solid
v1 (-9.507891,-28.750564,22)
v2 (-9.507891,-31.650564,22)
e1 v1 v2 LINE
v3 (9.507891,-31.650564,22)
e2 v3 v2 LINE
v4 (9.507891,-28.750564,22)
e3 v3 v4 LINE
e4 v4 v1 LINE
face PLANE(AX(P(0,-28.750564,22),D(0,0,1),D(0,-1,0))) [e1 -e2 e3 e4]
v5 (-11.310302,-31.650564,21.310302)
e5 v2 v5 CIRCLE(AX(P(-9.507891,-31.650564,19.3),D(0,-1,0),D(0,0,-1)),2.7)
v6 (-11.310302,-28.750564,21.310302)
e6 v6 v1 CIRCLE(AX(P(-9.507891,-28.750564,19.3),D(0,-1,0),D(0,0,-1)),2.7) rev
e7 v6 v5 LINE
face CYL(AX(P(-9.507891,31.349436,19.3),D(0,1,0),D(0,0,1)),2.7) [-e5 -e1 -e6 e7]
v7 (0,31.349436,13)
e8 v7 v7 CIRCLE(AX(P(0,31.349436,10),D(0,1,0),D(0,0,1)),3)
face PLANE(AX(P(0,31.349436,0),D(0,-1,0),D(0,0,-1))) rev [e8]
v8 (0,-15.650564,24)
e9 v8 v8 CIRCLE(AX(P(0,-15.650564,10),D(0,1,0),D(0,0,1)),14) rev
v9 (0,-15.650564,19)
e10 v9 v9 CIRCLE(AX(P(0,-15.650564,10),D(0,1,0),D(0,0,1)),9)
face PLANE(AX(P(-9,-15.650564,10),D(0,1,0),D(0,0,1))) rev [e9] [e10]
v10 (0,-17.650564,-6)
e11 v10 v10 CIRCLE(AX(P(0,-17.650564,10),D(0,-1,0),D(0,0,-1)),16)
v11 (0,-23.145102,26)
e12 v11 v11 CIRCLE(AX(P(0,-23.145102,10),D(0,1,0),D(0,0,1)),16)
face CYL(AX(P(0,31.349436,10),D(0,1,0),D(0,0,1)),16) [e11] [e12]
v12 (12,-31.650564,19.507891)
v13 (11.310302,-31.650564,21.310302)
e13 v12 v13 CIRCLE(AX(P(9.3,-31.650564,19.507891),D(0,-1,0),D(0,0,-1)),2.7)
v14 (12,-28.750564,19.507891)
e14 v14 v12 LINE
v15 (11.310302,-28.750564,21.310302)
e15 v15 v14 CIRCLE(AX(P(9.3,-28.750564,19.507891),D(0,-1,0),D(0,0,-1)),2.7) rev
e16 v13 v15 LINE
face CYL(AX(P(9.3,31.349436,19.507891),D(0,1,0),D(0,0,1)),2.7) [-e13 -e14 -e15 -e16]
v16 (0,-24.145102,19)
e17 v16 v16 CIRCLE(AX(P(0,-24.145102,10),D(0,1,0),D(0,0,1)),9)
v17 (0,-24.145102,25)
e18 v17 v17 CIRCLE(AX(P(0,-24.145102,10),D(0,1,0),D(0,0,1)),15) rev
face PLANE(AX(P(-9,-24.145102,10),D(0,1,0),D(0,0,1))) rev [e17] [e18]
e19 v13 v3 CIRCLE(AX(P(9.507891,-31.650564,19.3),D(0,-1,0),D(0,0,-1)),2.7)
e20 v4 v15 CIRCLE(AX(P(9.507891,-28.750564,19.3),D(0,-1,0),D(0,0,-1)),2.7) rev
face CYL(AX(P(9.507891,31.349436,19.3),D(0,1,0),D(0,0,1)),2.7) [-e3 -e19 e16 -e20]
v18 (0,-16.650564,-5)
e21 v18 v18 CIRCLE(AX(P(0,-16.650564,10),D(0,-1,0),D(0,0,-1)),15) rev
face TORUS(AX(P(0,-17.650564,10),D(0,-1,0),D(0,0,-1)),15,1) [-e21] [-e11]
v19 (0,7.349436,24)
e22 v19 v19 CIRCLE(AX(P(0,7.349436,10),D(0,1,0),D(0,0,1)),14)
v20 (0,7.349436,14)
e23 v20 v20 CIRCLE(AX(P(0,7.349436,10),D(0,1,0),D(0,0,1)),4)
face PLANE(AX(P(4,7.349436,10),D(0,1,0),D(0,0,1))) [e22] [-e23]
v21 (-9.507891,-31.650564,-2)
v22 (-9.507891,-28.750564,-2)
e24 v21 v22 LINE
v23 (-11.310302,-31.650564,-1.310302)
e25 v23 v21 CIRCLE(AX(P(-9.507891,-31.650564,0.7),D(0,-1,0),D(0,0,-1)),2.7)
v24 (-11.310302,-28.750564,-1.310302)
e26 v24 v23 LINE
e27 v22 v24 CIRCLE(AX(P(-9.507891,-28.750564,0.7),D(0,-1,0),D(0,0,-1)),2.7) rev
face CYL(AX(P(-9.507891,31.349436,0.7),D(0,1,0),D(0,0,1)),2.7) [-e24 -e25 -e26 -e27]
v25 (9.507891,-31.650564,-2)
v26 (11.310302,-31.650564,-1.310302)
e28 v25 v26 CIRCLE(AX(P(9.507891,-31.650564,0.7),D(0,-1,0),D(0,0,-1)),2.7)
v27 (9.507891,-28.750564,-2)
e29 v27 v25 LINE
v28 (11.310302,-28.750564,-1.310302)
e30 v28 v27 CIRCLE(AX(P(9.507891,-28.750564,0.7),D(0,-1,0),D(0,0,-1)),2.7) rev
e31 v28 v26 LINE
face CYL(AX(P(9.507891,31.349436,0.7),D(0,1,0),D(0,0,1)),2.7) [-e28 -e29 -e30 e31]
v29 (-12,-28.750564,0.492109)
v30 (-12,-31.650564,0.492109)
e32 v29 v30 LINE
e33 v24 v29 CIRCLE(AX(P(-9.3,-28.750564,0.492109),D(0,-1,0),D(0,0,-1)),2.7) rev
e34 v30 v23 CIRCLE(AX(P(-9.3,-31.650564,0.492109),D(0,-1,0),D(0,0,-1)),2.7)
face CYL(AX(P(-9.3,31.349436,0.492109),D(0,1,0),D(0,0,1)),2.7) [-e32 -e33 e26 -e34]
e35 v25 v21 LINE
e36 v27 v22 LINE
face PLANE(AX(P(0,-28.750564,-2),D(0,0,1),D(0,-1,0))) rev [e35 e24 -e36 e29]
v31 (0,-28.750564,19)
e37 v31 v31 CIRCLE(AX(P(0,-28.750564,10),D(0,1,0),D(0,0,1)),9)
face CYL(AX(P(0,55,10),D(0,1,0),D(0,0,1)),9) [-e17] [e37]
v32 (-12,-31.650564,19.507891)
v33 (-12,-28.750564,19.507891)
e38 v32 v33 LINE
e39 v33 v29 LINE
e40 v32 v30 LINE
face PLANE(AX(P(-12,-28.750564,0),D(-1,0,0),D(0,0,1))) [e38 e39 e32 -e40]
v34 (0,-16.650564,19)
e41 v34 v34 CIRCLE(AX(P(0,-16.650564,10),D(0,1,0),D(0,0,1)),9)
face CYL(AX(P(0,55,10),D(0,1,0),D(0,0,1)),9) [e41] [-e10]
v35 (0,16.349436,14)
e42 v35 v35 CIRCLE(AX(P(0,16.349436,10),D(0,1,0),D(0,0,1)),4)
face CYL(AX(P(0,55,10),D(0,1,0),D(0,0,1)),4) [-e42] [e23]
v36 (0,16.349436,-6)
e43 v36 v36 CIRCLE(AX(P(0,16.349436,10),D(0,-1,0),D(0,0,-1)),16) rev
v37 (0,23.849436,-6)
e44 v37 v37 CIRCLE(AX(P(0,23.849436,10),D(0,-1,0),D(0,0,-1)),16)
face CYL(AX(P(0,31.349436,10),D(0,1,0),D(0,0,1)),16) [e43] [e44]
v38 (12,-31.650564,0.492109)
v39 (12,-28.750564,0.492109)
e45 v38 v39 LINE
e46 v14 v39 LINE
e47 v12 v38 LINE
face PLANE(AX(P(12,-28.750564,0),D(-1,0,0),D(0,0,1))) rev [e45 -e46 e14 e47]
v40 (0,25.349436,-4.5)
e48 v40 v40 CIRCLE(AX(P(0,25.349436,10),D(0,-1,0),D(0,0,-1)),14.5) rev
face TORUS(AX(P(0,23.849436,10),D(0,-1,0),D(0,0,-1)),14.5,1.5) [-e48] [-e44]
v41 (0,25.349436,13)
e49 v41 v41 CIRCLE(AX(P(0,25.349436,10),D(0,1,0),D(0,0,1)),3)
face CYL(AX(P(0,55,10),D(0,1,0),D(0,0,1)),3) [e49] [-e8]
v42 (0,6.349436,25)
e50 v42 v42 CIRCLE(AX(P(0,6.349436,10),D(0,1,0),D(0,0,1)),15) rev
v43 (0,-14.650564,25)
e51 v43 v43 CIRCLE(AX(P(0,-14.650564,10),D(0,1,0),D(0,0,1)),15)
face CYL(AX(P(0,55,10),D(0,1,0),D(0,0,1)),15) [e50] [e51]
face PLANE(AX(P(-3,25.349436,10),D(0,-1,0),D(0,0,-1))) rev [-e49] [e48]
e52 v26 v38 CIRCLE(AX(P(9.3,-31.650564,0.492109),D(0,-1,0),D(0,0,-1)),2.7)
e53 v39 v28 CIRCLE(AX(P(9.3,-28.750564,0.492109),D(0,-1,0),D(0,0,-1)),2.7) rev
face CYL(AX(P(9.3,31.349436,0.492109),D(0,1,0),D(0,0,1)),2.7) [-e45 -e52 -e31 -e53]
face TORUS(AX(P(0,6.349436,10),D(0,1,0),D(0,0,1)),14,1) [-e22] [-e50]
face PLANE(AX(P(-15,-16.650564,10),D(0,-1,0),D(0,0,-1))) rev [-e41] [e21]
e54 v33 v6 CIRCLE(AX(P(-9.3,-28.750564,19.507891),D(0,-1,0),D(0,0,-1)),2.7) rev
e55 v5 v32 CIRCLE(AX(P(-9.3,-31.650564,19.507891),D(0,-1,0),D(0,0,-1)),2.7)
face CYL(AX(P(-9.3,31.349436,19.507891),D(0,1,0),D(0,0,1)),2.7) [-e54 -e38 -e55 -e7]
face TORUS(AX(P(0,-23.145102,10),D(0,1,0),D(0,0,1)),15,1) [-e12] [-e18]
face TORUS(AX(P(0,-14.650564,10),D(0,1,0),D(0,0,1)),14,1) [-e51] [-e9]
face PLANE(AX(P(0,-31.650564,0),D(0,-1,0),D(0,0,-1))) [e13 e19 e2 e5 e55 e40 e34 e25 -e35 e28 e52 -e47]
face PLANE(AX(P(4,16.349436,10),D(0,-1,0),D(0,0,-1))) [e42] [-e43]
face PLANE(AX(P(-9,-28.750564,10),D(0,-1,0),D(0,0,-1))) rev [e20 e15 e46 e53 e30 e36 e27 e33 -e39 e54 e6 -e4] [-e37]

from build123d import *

# Parameters (mm, degrees)
SKIZZE1_W                       = 16
SKIZZE1_H                       = 63
SKIZZE6_W                       = 14.056140901
SKIZZE6_H                       = 6
SCHNITT_LINEAR_AUSTRAGEN2_DEPTH = 2.9
SKIZZE8_W                       = 9.697943534
SKIZZE8_H                       = 4.605462576
VERRUNDUNG1_R                   = 2.7
SKIZZE9_W                       = 13.512274764
SKIZZE9_H                       = 9
SKIZZE11_W                      = 2.793838278
SKIZZE11_H                      = 24.477994545
SKIZZE12_W                      = 8.586499361
SKIZZE12_H                      = 1
VERRUNDUNG2_R                   = 1.5
VERRUNDUNG3_R                   = 1
VERRUNDUNG4_R                   = 1


with BuildPart() as part:
    # Skizze1 → Rotation1 (revolve)
    with BuildSketch(Plane(origin=(0, 0, 0), x_dir=(0, 0, -1), z_dir=(1, 0, 0))):
        with Locations((-18, -0.15056419)):
            Rectangle(SKIZZE1_W, SKIZZE1_H)
    revolve(axis=Axis((0, 31.34943581, 10), (0, -1, 0)))

    # Skizze6 → Schnitt-Rotation1 (revolve, cut)
    with BuildSketch(Plane.XY.offset(10), mode=Mode.PRIVATE) as schnitt_rotation1_sk:
        with Locations((-10.028070451, 28.34943581)):
            Rectangle(SKIZZE6_W, SKIZZE6_H)
    revolve(schnitt_rotation1_sk.sketch.rotate(Axis((0, 55, 10), (0, -1, 0)), 270), axis=Axis((0, 55, 10), (0, -1, 0)), mode=Mode.SUBTRACT)

    # Skizze7 → Schnitt-Linear austragen2 (cut)
    with BuildSketch(Plane.XZ.offset(31.65056419)):
        with BuildLine():
            Line((-10.583005244, 22), (10.583005244, 22))
            ThreePointArc((10.583005244, 22), (0, 26), (-10.583005244, 22))
        make_face()
        with BuildLine():
            ThreePointArc((16, 10), (14.966629547, 15.656854249), (12, 20.583005244))
            Line((12, 20.583005244), (12, -0.583005244))
            ThreePointArc((12, -0.583005244), (14.966629547, 4.343145751), (16, 10))
        make_face()
        with BuildLine():
            ThreePointArc((-10.583005244, -2), (0, -6), (10.583005244, -2))
            Line((10.583005244, -2), (-10.583005244, -2))
        make_face()
        with BuildLine():
            Line((-12, -0.583005244), (-12, 20.583005244))
            ThreePointArc((-12, 20.583005244), (-16, 10), (-12, -0.583005244))
        make_face()
    extrude(amount=-SCHNITT_LINEAR_AUSTRAGEN2_DEPTH, mode=Mode.SUBTRACT)

    # Skizze8 → Schnitt-Rotation2 (revolve, cut)
    with BuildSketch(Plane.XY.offset(10), mode=Mode.PRIVATE) as schnitt_rotation2_sk:
        with Locations((-13.848971767, -26.447832902)):
            Rectangle(SKIZZE8_W, SKIZZE8_H)
    revolve(schnitt_rotation2_sk.sketch.rotate(Axis((0, 55, 10), (0, -1, 0)), 270), axis=Axis((0, 55, 10), (0, -1, 0)), mode=Mode.SUBTRACT)

    # Verrundung1
    # the kernel refuses this fillet: 2.7 mm, written as the material it takes off along each edge
    with BuildSketch(Plane(origin=(-12, -34.598571865, 20.583005244), x_dir=(0.6886261541674549, 0, 0.72511655600775), z_dir=(0, 1, 0)), Plane(origin=(-10.583005244, -34.598571865, -2), x_dir=(-0.7251165560077487, 0, 0.6886261541674565), z_dir=(0, 1, 0)), Plane(origin=(10.583005244, -34.598571865, 22), x_dir=(0.72511655600775, 0, -0.6886261541674551), z_dir=(0, 1, 0)), Plane(origin=(12, -34.598571865, -0.583005244), x_dir=(-0.6886261541674555, 0, -0.7251165560077496), z_dir=(0, 1, 0))) as verrundung1_piece_1:
        with BuildLine():
            CenterArc((1.079707811, 2.698166172), VERRUNDUNG1_R, 226.478544781, 45.633288329)
            Line((-0.779582805, 0.740351471), (0, 0))
            ThreePointArc((0, 0), (0.589601535, -0.010867127), (1.17920307, 0))
        make_face()
    extrude(amount=8.796015351, mode=Mode.SUBTRACT)
    with BuildSketch(Plane(origin=(-12, -34.598571865, -0.583005244), x_dir=(0, 0, 1), z_dir=(0, 1, 0)), Plane(origin=(10.583005244, -34.598571865, -2), x_dir=(-1, 0, 0), z_dir=(0, 1, 0)), Plane(origin=(12, -34.598571865, 20.583005244), x_dir=(0, 0, -1), z_dir=(0, 1, 0))) as verrundung1_piece_2:
        with BuildLine():
            CenterArc((1.075113785, 2.7), VERRUNDUNG1_R, 224.366711671, 45.633288329)
            ThreePointArc((-0.855059669, 0.812030075), (-0.435013222, 0.398135104), (0, 0))
            Line((0, 0), (1.075113785, 0))
        make_face()
    extrude(amount=8.796015351, mode=Mode.SUBTRACT)
    with BuildSketch(Plane(origin=(-10.583005244, -34.598571865, 22), x_dir=(-0.7251165560077509, 0, -0.6886261541674541), z_dir=(0, 1, 0))) as verrundung1_piece_3:
        with BuildLine():
            CenterArc((1.079707811, -2.698166172), VERRUNDUNG1_R, 87.88816689, 45.633288329)
            Line((-0.779582805, -0.740351471), (0, 0))
            ThreePointArc((0, 0), (0.589601535, 0.010867127), (1.17920307, 0))
        make_face()
    extrude(amount=8.796015351, mode=Mode.SUBTRACT)

    # Skizze9 → Schnitt-Rotation3 (revolve, cut)
    with BuildSketch(Plane.XY.offset(10), mode=Mode.PRIVATE) as schnitt_rotation3_sk:
        with Locations((10.756137382, 11.84943581)):
            Rectangle(SKIZZE9_W, SKIZZE9_H)
    revolve(schnitt_rotation3_sk.sketch.rotate(Axis((0, 55, 10), (0, -1, 0)), 90), axis=Axis((0, 55, 10), (0, -1, 0)), mode=Mode.SUBTRACT)

    # Skizze11 → Schnitt-Rotation4 (revolve, cut)
    with BuildSketch(Plane.XY.offset(10), mode=Mode.PRIVATE) as schnitt_rotation4_sk:
        with Locations((-16.396919139, -4.411566918)):
            Rectangle(SKIZZE11_W, SKIZZE11_H)
    revolve(schnitt_rotation4_sk.sketch.rotate(Axis((0, 55, 10), (0, -1, 0)), 270), axis=Axis((0, 55, 10), (0, -1, 0)), mode=Mode.SUBTRACT)

    # Skizze12 → Schnitt-Rotation5 (revolve, cut)
    with BuildSketch(Plane.XY.offset(10), mode=Mode.PRIVATE) as schnitt_rotation5_sk:
        with Locations((-13.293249681, -16.15056419)):
            Rectangle(SKIZZE12_W, SKIZZE12_H)
    revolve(schnitt_rotation5_sk.sketch.rotate(Axis((0, 55, 10), (0, -1, 0)), 270), axis=Axis((0, 55, 10), (0, -1, 0)), mode=Mode.SUBTRACT)

    # Verrundung2
    verrundung2_edges = [part.edges().sort_by_distance(p)[0] for p in [
        (0, 25.34943581, -6),
    ]]
    fillet(verrundung2_edges, radius=VERRUNDUNG2_R)

    # Verrundung3
    verrundung3_edges = [part.edges().sort_by_distance(p)[0] for p in [
        (0, -16.65056419, -6),
        (0, -24.145101614, -6),
    ]]
    fillet(verrundung3_edges, radius=VERRUNDUNG3_R)

    # Verrundung4
    verrundung4_edges = [part.edges().sort_by_distance(p)[0] for p in [
        (0, 7.34943581, -5),
        (0, -15.65056419, -5),
    ]]
    fillet(verrundung4_edges, radius=VERRUNDUNG4_R)


solid = part.part
